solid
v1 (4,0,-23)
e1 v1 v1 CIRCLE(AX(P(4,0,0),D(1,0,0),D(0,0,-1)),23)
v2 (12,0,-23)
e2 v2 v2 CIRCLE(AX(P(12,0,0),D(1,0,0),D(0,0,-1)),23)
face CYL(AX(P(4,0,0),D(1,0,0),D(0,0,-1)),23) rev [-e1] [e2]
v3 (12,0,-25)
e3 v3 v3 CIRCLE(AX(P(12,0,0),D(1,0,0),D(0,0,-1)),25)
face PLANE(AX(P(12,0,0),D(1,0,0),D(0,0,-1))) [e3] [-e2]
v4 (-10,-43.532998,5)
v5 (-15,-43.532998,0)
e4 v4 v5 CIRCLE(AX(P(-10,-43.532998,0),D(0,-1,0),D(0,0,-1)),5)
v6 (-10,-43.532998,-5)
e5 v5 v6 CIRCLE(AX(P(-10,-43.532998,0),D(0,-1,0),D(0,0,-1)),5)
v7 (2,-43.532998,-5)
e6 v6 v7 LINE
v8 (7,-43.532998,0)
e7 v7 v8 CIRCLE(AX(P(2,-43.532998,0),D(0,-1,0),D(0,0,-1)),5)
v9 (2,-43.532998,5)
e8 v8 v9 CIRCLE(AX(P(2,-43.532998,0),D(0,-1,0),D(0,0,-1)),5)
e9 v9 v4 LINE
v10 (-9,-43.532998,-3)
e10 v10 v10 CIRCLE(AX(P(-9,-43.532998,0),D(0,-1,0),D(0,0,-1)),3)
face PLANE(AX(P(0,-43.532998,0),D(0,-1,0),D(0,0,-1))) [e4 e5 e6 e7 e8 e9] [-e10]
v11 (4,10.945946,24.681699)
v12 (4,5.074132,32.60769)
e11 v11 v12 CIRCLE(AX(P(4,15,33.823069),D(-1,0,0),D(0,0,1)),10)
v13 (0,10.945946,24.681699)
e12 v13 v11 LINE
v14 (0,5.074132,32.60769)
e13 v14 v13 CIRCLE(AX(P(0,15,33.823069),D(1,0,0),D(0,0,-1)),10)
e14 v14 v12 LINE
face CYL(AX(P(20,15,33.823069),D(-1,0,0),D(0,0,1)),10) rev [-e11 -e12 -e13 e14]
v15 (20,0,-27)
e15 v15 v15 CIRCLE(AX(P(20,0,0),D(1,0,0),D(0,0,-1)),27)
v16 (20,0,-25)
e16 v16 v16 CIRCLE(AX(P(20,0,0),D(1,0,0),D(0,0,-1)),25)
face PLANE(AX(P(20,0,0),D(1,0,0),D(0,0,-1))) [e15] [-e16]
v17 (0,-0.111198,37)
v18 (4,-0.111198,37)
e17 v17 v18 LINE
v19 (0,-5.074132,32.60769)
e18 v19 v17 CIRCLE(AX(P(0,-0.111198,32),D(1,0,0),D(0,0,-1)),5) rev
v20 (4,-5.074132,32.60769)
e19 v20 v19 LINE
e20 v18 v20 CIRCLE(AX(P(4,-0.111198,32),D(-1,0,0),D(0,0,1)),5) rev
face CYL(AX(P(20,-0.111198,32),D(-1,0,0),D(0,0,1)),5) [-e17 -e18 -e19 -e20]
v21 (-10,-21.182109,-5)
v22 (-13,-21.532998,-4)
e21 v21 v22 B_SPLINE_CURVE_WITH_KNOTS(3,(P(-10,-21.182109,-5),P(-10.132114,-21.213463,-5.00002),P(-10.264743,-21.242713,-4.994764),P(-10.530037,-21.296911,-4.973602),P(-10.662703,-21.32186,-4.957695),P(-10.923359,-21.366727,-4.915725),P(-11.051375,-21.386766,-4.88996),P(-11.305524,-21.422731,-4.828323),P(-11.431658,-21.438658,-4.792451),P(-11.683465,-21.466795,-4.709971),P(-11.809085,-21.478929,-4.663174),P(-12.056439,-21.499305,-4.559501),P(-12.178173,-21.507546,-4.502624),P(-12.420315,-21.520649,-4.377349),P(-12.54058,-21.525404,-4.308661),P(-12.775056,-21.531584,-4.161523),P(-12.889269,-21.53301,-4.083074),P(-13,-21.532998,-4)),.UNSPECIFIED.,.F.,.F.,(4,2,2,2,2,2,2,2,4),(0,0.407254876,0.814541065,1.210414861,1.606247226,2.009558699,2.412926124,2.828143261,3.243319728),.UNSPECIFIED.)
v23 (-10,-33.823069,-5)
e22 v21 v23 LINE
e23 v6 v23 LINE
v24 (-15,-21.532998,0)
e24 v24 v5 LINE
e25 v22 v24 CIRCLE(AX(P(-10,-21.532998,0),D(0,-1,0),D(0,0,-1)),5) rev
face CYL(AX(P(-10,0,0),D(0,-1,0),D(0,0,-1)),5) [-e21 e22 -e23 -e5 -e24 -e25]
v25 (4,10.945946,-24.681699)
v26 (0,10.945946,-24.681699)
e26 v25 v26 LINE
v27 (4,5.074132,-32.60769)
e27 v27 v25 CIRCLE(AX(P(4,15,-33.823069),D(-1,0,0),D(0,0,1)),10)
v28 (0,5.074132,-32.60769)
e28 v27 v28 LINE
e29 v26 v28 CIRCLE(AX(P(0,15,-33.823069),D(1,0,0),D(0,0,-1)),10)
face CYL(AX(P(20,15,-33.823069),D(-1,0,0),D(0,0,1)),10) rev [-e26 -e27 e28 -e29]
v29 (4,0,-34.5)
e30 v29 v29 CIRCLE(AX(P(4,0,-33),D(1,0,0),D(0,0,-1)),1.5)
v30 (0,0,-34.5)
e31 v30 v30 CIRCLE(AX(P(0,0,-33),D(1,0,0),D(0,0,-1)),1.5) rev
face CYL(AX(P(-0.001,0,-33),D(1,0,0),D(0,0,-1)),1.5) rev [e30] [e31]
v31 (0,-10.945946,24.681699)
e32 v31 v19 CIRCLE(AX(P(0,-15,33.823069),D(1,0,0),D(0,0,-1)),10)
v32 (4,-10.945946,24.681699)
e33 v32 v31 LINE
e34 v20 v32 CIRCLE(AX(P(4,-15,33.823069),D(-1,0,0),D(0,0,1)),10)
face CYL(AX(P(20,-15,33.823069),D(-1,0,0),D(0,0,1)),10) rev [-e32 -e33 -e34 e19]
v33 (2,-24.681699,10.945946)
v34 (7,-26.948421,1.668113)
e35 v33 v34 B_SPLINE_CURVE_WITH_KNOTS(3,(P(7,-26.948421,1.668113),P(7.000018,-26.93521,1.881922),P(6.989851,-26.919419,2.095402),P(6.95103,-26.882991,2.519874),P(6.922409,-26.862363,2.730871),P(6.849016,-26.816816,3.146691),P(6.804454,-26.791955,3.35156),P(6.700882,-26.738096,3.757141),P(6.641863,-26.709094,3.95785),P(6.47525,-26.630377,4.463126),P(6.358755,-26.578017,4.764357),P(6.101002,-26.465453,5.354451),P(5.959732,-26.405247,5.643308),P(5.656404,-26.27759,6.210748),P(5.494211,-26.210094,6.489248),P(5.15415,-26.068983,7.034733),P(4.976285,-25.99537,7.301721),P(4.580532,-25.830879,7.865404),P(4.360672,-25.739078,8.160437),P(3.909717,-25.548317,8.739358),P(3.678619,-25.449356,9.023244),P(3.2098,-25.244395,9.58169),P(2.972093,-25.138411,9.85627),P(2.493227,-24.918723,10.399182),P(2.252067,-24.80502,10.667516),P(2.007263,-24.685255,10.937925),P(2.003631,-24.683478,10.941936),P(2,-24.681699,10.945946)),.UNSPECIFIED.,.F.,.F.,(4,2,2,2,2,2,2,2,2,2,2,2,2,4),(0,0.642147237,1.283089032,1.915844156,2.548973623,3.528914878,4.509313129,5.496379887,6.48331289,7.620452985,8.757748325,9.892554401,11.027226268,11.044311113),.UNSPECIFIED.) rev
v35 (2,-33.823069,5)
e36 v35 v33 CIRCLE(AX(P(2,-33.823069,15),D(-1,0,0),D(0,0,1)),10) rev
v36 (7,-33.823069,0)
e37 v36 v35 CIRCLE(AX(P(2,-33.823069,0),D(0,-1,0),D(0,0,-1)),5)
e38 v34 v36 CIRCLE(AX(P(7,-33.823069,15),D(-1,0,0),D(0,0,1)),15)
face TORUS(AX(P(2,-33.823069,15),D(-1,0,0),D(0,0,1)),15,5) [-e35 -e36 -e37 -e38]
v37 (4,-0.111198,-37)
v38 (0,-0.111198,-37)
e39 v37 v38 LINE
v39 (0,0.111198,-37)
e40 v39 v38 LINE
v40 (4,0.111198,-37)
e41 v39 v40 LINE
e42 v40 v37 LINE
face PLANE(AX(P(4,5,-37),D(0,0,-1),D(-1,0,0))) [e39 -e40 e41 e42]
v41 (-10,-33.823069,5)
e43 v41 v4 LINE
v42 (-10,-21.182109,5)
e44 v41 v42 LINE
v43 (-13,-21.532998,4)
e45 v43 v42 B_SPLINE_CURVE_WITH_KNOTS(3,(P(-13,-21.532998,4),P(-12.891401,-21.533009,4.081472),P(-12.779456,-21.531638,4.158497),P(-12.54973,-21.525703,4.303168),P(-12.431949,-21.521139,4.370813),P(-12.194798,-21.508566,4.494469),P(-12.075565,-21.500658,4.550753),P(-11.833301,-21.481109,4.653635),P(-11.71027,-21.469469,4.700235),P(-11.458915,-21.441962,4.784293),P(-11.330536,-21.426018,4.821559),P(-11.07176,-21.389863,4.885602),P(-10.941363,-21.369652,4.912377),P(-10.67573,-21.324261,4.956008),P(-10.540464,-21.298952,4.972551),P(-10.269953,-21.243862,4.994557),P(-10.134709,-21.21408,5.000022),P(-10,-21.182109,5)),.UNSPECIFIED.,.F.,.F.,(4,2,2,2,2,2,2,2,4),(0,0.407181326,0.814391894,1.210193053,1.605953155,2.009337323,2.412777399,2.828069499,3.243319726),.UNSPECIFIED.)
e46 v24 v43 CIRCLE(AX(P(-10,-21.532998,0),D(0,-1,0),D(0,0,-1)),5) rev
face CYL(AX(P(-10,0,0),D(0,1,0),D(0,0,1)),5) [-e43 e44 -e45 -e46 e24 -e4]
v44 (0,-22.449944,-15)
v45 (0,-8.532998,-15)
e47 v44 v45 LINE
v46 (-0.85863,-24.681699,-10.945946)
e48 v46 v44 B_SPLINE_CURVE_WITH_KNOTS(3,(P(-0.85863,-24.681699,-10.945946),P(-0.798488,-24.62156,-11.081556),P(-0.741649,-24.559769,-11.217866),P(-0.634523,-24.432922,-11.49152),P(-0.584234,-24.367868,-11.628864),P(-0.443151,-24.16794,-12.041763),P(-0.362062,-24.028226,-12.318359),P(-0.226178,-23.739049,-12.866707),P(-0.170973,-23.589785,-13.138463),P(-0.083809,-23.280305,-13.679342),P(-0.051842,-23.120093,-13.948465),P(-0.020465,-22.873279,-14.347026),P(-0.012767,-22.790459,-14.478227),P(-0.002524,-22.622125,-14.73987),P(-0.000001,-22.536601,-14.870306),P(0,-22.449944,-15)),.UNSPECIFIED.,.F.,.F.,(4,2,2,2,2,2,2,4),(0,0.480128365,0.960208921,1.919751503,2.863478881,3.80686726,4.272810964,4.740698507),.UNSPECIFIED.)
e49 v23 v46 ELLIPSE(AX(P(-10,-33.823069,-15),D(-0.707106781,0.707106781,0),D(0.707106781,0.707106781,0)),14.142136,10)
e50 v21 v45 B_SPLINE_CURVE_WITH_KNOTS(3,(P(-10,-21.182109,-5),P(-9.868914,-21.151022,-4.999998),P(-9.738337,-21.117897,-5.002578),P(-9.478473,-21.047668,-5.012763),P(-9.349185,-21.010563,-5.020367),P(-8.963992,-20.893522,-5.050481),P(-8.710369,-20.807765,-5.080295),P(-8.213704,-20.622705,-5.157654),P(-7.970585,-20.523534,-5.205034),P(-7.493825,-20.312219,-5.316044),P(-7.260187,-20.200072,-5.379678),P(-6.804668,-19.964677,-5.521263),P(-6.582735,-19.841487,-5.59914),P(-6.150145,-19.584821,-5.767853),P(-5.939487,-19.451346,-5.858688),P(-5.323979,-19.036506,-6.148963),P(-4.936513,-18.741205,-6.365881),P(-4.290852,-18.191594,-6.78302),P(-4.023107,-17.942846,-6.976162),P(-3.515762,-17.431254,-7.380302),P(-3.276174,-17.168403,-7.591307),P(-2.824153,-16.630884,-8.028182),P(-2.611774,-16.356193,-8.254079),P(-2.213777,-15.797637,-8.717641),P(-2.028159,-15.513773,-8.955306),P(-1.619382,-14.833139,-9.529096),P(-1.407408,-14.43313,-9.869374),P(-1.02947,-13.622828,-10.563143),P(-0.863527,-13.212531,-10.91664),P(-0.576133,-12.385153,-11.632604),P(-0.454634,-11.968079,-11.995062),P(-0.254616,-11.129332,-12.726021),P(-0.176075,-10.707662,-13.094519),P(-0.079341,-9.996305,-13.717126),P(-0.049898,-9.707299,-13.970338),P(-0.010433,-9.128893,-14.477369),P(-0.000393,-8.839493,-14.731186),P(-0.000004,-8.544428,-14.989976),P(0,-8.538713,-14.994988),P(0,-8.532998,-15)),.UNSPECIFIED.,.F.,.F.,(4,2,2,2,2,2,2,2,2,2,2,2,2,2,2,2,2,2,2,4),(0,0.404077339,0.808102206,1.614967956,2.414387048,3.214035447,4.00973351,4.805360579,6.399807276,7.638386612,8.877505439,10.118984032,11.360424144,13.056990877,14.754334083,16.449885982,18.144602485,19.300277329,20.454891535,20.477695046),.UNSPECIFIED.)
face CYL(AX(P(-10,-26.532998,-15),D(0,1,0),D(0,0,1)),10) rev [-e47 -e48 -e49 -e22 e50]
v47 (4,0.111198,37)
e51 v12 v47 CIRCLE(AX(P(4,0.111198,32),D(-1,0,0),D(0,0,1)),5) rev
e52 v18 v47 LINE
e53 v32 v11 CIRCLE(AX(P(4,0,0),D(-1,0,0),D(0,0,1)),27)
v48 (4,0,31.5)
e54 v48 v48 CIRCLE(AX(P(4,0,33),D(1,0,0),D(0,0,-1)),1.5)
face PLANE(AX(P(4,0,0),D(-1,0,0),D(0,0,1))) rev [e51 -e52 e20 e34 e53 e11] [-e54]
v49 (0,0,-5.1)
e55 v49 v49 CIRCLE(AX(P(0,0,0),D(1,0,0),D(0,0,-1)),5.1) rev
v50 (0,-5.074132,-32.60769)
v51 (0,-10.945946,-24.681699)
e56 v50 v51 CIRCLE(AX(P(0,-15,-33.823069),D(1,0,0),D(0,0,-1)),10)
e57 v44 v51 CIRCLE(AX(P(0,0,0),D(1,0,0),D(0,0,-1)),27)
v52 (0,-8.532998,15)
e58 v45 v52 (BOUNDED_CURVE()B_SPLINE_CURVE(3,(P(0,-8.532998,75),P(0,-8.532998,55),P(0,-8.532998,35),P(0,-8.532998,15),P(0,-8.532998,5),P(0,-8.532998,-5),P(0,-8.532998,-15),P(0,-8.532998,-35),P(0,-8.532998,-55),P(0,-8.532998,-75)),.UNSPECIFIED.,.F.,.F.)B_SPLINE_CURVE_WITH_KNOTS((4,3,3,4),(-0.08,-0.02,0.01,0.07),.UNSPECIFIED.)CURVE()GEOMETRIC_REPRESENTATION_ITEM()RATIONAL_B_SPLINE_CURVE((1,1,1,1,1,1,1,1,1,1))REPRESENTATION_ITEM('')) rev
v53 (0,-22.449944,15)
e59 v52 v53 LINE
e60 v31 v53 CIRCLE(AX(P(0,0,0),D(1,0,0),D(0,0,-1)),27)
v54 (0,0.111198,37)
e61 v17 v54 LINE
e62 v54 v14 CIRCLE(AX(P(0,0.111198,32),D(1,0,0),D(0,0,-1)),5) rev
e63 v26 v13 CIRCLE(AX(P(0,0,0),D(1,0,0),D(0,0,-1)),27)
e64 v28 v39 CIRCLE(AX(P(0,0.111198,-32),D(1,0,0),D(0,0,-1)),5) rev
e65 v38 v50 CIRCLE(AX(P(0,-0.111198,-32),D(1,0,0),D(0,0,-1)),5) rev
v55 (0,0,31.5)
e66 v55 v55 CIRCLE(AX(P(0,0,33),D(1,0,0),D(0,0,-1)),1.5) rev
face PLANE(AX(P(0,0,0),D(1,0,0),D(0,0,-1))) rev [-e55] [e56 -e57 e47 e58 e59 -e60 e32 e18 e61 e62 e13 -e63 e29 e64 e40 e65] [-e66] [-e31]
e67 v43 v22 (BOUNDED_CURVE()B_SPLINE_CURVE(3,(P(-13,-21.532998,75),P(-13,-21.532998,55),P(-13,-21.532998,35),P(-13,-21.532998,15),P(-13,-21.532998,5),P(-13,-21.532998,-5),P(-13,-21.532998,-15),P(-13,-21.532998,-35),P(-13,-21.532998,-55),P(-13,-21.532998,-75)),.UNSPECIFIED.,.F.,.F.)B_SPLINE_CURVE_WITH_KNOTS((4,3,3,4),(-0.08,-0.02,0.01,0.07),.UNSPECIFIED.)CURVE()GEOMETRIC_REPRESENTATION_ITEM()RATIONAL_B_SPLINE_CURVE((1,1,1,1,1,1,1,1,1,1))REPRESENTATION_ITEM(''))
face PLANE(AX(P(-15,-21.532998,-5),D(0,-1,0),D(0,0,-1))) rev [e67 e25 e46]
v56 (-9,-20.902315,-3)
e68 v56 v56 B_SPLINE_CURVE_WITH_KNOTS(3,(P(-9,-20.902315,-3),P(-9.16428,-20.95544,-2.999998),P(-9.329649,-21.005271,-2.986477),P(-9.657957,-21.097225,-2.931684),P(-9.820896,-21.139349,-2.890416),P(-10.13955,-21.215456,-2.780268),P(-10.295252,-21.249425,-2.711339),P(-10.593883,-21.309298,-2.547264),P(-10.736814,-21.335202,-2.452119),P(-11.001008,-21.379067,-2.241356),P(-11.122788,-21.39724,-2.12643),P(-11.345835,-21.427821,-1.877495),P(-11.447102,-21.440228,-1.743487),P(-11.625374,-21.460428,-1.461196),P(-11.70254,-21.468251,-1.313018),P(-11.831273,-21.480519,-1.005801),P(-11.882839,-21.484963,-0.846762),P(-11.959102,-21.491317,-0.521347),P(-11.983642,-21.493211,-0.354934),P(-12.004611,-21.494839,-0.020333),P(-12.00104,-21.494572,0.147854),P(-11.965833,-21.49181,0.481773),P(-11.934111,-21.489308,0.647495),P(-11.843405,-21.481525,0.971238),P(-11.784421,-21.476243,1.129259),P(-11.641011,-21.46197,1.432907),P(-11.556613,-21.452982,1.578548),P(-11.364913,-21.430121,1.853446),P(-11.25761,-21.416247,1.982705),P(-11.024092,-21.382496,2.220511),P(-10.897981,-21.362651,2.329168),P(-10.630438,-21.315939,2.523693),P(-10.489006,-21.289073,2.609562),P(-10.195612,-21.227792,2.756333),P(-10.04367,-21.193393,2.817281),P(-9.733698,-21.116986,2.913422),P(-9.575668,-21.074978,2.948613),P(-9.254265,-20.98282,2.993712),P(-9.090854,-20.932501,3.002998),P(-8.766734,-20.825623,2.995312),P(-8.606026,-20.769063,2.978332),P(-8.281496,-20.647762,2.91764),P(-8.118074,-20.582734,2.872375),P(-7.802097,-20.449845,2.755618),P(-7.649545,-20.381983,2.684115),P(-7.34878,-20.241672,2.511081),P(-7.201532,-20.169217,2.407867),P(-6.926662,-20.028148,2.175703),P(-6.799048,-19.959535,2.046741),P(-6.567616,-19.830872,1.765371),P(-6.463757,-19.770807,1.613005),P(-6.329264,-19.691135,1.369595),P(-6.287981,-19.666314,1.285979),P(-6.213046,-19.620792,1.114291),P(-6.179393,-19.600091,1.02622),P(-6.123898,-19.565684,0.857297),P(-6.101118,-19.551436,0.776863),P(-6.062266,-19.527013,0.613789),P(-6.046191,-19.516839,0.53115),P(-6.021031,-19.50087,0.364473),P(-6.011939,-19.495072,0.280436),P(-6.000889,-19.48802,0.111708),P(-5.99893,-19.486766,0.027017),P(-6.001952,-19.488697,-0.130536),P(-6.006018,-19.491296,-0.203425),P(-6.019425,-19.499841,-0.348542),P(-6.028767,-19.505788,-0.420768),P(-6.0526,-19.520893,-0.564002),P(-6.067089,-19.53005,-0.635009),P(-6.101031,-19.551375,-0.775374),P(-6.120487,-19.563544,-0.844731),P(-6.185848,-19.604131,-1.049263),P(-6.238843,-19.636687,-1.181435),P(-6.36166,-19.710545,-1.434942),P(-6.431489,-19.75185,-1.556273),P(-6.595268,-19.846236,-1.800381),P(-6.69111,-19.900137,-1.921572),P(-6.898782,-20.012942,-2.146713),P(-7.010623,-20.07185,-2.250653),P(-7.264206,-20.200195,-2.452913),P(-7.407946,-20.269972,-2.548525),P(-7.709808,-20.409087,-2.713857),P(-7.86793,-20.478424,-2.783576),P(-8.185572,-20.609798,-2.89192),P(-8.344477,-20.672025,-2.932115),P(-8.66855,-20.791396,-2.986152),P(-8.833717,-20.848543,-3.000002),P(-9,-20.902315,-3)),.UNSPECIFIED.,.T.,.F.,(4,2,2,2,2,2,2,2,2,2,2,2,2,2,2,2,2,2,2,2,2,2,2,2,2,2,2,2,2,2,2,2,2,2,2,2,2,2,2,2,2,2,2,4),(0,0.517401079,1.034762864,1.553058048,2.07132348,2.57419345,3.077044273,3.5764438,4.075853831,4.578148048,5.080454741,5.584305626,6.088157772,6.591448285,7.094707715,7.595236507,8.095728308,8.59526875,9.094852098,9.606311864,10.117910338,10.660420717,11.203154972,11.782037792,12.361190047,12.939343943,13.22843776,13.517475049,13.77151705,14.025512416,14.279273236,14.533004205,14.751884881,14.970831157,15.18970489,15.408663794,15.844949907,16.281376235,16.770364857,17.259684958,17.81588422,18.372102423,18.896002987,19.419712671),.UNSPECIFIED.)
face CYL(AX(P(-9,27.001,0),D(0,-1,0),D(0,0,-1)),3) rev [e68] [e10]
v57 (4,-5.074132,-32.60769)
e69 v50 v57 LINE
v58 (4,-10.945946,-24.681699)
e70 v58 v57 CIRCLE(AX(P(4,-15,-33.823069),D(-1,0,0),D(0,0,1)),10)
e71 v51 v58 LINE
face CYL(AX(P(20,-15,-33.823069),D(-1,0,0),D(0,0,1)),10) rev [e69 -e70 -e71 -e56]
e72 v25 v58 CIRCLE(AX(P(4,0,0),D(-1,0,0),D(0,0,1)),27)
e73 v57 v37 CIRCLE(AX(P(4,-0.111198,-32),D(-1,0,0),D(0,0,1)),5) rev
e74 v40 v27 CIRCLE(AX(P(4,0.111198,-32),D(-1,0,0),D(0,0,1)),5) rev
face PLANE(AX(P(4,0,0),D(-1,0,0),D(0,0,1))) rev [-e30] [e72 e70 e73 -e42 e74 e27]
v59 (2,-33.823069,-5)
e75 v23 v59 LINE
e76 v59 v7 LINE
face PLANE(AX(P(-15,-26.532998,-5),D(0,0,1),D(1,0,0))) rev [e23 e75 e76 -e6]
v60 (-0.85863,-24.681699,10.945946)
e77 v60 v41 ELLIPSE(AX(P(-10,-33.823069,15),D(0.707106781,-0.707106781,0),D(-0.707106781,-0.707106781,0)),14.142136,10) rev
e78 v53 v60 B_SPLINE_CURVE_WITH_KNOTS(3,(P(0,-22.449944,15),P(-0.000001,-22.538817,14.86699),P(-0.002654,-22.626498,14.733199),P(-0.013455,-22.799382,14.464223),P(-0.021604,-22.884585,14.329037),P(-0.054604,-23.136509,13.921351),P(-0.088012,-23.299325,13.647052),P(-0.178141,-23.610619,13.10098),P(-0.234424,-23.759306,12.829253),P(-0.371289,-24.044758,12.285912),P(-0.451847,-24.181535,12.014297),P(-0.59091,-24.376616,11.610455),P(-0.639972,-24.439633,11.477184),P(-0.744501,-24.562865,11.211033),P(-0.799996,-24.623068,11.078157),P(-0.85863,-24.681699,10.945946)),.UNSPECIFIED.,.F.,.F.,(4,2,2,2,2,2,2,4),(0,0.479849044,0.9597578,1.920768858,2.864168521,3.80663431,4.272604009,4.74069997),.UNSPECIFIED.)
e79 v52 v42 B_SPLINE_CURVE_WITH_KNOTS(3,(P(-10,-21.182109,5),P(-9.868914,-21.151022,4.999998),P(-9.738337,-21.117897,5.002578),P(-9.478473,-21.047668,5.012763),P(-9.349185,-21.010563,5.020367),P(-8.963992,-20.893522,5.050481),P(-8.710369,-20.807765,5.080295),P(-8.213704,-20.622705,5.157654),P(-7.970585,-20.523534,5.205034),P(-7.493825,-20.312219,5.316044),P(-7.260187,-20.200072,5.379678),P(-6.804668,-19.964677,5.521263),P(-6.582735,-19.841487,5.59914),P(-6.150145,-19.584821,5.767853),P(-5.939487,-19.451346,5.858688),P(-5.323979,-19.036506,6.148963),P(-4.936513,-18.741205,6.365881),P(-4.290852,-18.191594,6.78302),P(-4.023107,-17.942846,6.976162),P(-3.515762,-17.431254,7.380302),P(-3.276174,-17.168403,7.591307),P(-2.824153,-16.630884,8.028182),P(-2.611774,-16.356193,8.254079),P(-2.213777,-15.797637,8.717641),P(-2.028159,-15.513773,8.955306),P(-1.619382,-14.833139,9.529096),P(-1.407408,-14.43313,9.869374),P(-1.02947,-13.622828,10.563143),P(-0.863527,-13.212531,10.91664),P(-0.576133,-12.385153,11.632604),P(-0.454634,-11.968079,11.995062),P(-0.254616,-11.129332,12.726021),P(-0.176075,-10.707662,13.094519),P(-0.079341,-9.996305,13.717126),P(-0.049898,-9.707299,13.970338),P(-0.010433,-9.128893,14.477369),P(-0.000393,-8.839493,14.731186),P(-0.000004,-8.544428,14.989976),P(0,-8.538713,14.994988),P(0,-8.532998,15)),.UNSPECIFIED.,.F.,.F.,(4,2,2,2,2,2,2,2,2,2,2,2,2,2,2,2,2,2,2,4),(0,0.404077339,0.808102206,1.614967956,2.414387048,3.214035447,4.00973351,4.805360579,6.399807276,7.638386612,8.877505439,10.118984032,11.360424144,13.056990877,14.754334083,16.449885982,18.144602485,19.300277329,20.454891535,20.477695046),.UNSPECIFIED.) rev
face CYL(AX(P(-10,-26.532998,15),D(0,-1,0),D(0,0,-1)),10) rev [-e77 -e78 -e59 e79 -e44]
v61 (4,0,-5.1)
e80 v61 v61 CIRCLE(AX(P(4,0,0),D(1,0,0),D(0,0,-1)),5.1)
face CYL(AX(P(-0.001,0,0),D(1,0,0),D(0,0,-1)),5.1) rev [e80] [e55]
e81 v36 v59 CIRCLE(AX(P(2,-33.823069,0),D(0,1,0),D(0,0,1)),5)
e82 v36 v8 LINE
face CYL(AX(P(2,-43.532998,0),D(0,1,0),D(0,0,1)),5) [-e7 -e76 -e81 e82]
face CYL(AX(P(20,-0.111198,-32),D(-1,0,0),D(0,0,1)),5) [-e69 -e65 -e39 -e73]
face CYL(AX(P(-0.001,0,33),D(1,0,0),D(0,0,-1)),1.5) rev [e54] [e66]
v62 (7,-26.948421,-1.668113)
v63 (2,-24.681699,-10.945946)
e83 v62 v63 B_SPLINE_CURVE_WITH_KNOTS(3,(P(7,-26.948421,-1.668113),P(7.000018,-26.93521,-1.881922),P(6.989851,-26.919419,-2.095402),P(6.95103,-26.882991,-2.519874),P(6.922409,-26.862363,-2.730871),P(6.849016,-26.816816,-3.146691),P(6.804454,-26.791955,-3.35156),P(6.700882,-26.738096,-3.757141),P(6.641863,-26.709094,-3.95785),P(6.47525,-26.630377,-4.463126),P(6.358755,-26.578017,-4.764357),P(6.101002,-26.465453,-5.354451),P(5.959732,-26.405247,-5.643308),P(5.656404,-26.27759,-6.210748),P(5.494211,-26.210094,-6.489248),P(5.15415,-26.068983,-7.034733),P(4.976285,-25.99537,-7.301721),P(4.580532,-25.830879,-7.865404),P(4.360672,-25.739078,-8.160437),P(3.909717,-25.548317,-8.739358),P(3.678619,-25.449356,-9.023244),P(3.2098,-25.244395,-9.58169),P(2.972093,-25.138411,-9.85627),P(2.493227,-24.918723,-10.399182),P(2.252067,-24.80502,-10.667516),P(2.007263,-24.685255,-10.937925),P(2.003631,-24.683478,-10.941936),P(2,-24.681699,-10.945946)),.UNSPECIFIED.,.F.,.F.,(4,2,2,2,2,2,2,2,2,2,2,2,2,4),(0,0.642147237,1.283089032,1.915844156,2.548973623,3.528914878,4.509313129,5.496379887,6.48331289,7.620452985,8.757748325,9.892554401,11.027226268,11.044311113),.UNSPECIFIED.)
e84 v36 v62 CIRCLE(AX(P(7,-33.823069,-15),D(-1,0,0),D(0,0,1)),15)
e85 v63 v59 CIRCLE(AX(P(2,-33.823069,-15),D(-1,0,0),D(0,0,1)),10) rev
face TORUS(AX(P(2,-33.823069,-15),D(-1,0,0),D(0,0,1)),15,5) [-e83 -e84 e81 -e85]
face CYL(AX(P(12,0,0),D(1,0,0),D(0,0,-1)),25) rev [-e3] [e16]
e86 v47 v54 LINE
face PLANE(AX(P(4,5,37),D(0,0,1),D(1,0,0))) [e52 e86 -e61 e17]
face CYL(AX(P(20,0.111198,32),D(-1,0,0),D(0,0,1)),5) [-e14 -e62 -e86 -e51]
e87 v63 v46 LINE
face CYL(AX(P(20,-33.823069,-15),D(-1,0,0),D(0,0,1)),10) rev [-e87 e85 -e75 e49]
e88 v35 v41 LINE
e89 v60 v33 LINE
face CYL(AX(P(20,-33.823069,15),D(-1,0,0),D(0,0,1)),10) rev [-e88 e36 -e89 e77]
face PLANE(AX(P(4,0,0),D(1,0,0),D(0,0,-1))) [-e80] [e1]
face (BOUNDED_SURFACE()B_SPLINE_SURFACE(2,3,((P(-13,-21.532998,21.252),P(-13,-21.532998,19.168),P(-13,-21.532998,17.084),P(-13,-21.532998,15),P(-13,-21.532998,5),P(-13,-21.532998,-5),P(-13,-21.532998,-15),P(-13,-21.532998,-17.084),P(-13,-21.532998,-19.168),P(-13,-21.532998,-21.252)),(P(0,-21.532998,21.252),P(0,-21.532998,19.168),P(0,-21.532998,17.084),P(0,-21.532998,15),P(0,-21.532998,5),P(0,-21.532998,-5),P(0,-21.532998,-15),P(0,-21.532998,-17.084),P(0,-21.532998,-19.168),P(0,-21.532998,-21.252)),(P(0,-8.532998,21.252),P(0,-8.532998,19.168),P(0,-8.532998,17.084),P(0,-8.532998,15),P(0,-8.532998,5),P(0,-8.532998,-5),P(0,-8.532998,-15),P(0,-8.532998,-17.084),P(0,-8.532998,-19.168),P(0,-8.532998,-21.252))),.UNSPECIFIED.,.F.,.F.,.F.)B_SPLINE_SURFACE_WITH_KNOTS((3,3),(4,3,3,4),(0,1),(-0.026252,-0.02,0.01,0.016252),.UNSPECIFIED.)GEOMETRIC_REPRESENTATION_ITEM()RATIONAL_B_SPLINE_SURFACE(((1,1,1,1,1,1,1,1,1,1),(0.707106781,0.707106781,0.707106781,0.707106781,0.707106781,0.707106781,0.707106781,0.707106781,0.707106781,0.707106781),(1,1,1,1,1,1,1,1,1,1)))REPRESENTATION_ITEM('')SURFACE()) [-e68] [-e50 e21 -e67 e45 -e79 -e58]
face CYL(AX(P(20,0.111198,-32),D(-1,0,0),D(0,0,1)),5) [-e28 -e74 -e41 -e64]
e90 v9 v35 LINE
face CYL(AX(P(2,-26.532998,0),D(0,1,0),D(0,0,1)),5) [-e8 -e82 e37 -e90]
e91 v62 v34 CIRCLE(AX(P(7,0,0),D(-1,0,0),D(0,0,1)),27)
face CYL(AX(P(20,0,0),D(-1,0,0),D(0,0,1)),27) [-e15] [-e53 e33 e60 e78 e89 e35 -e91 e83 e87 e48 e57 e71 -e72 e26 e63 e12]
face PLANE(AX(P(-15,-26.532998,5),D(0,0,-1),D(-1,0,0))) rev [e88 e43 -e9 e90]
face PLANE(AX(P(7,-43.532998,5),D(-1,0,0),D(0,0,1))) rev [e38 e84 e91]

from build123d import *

# Parameters (mm, degrees)
SKETCH_1_R          = 27
EXTRUDE_1_DEPTH     = 20
EXTRUDE_2_DEPTH     = 4
SKETCH_2_R          = 25
CUT_EXTRUDE_1_DEPTH = 8
SKETCH_3_R          = 23
CUT_EXTRUDE_2_DEPTH = 8
CUT_EXTRUDE_5_REACH = 50.518
SKETCH_8_R          = 5.1
CUT_EXTRUDE_6_REACH = 50.518
SKETCH_11_R         = 1.5
FILLET_1_R          = 10
FILLET_2_R          = 5
SKETCH_12_W         = 10
SKETCH_12_H         = 5
EXTRUDE_3_DEPTH     = 15
SKETCH_13_W         = 22
SKETCH_13_H         = 10
EXTRUDE_4_DEPTH     = 17
FILLET_3_R          = 10
FILLET_START        = -21.532998323
FILLET_4_DEPTH      = 0.497094834
FILLET_START_2      = -21.035903489
FILLET_4_2_DEPTH    = 12.502905266
FILLET_START_3      = -37
FILLET_4_3_DEPTH    = 74
FILLET_START_4      = -5
FILLET_4_4_DEPTH    = 10
CUT_EXTRUDE_7_REACH = 84.121
SKETCH_14_R         = 3
FILLET_5_R          = 5


with BuildPart() as part:
    # 草图1 → 凸台-拉伸1 (new body)
    with BuildSketch(Plane(origin=(0, 0, 0), x_dir=(0, 0, -1), z_dir=(1, 0, 0))):
        Circle(SKETCH_1_R)
    extrude(amount=EXTRUDE_1_DEPTH)

    # 草图10 → 凸台-拉伸2 (add)
    with BuildSketch(Plane.ZY):
        Polygon((0, 5), (37, 5), (37, -5), (0, -5), (-37, -5), (-37, 5), align=None)
    extrude(amount=-EXTRUDE_2_DEPTH)

    # 草图2 → 切除-拉伸1 (cut)
    with BuildSketch(Plane(origin=(20, 0, 0), x_dir=(0, 0, -1), z_dir=(1, 0, 0))):
        Circle(SKETCH_2_R)
    extrude(amount=-CUT_EXTRUDE_1_DEPTH, mode=Mode.SUBTRACT)

    # 草图3 → 切除-拉伸2 (cut)
    with BuildSketch(Plane(origin=(12, 0, 0), x_dir=(0, 0, -1), z_dir=(1, 0, 0))):
        Circle(SKETCH_3_R)
    extrude(amount=-CUT_EXTRUDE_2_DEPTH, mode=Mode.SUBTRACT)

    # 草图8 → 切除-拉伸5 (cut, up to next)
    with BuildSketch(Plane(origin=(4, 0, 0), x_dir=(0, 0, -1), z_dir=(1, 0, 0)), mode=Mode.PRIVATE) as cut_extrude_5_sk1:
        Circle(SKETCH_8_R)
    cut_extrude_5_tool1 = extrude(cut_extrude_5_sk1.sketch, amount=-CUT_EXTRUDE_5_REACH, mode=Mode.PRIVATE) & part.part
    add(cut_extrude_5_tool1.solids().sort_by_distance((4, 0, 0))[0], mode=Mode.SUBTRACT)

    # 草图11 → 切除-拉伸6 (cut, up to next)
    with BuildSketch(Plane(origin=(4, 0, 0), x_dir=(0, 0, -1), z_dir=(1, 0, 0)), mode=Mode.PRIVATE) as cut_extrude_6_sk1:
        with Locations((-33, 0)):
            Circle(SKETCH_11_R)
    cut_extrude_6_tool1 = extrude(cut_extrude_6_sk1.sketch, amount=-CUT_EXTRUDE_6_REACH, mode=Mode.PRIVATE) & part.part
    # 草图11 → 切除-拉伸6 (cut, up to next)
    with BuildSketch(Plane(origin=(4, 0, 0), x_dir=(0, 0, -1), z_dir=(1, 0, 0)), mode=Mode.PRIVATE) as cut_extrude_6_sk2:
        with Locations((33, 0)):
            Circle(SKETCH_11_R)
    cut_extrude_6_tool2 = extrude(cut_extrude_6_sk2.sketch, amount=-CUT_EXTRUDE_6_REACH, mode=Mode.PRIVATE) & part.part
    add(cut_extrude_6_tool1.solids().sort_by_distance((4, 0, 33))[0], mode=Mode.SUBTRACT)
    add(cut_extrude_6_tool2.solids().sort_by_distance((4, 0, -33))[0], mode=Mode.SUBTRACT)

    # 圆角1
    fillet_1_edges = [part.edges().sort_by_distance(p)[0] for p in [
        (2, 5, -26.532998323),
        (2, 5, 26.532998323),
        (2, -5, 26.532998323),
        (2, -5, -26.532998323),
    ]]
    fillet(fillet_1_edges, radius=FILLET_1_R)

    # 圆角2
    fillet_2_edges = [part.edges().sort_by_distance(p)[0] for p in [
        (2, 5, 37),
        (2, -5, 37),
        (2, -5, -37),
        (2, 5, -37),
    ]]
    fillet(fillet_2_edges, radius=FILLET_2_R)

    # 草图12 → 凸台-拉伸3 (add)
    with BuildSketch(Plane.ZY):
        with Locations((0, -24.032998323)):
            Rectangle(SKETCH_12_W, SKETCH_12_H)
    extrude(amount=EXTRUDE_3_DEPTH)

    # 草图13 → 凸台-拉伸4 (add)
    with BuildSketch(Plane.XZ.offset(26.532998323)):
        with Locations((-4, 0)):
            Rectangle(SKETCH_13_W, SKETCH_13_H)
    extrude(amount=EXTRUDE_4_DEPTH)

    # 圆角3
    fillet_3_edges = [part.edges().sort_by_distance(p)[0] for p in [
        (0, -24.032998323, -5),
        (0, -24.032998323, 5),
        (3.5, -26.532998323, -5),
        (3.5, -26.532998323, 5),
    ]]
    fillet(fillet_3_edges, radius=FILLET_3_R)

    # 圆角4: read off the stored shape, not the designer's step
    # 圆角4 outline → 圆角4 (add)
    with BuildSketch(Plane(origin=(0, 0, 0), x_dir=(1, 0, 0), z_dir=(0, 1, 0)).offset(FILLET_START)):
        with BuildLine():
            Line((0, -15), (0, -5))
            Line((0, -5), (-10, -5))
            ThreePointArc((-10, -5), (-2.928932188, -7.928932188), (0, -15))
        make_face()
        with BuildLine():
            ThreePointArc((0, 15), (-2.928932188, 7.928932188), (-10, 5))
            Line((-10, 5), (0, 5))
            Line((0, 5), (0, 15))
        make_face()
    extrude(amount=FILLET_4_DEPTH)

    # Fillet 4 2 outline → Fillet 4 2 (add)
    with BuildSketch(Plane(origin=(0, 0, 0), x_dir=(1, 0, 0), z_dir=(0, 1, 0)).offset(FILLET_START_2)):
        with BuildLine():
            Line((0, -15), (0, -5))
            Line((0, -5), (-10, -5))
            ThreePointArc((-10, -5), (-2.928932188, -7.928932188), (0, -15))
        make_face()
        with BuildLine():
            ThreePointArc((0, 15), (-2.928932188, 7.928932188), (-10, 5))
            Line((-10, 5), (0, 5))
            Line((0, 5), (0, 15))
        make_face()
    extrude(amount=FILLET_4_2_DEPTH)

    # Fillet 4 3 outline → Fillet 4 3 (cut)
    with BuildSketch(Plane.XY.offset(FILLET_START_3)):
        with BuildLine():
            Line((-15, -21.532998323), (-13, -21.532998323))
            add(Edge.make_bspline(
                [(-13, -21.532998323), (0, -21.532998323), (0, -8.532998323)],
                knots=[0, 0, 0, 1, 1, 1], degree=2, weights=[1, 0.707106781, 1]))
            Line((0, -8.532998323), (0, -7))
            Line((0, -7), (-15, -7))
            Line((-15, -7), (-15, -21.532998323))
        make_face()
    extrude(amount=FILLET_4_3_DEPTH, mode=Mode.SUBTRACT)

    # Fillet 4 4 outline → Fillet 4 4 (add)
    with BuildSketch(Plane.XY.offset(FILLET_START_4)):
        with BuildLine():
            add(Edge.make_bspline(
                [(-13, -21.532998323), (0, -21.532998323), (0, -8.532998323)],
                knots=[0, 0, 0, 1, 1, 1], degree=2, weights=[1, 0.707106781, 1]))
            Line((-13, -21.532998323), (0, -21.532998323))
            Line((0, -21.532998323), (0, -8.532998323))
        make_face()
    extrude(amount=FILLET_4_4_DEPTH)

    # 草图14 → 切除-拉伸7 (cut, up to next)
    with BuildSketch(Plane(origin=(0, -43.532998323, 0), x_dir=(-1, 0, 0), z_dir=(0, -1, 0)), mode=Mode.PRIVATE) as cut_extrude_7_sk1:
        with Locations(Location((9, 0, 0), (0, 0, 90))):
            Circle(SKETCH_14_R)
    cut_extrude_7_tool1 = extrude(cut_extrude_7_sk1.sketch, amount=-CUT_EXTRUDE_7_REACH, mode=Mode.PRIVATE) & part.part
    add(cut_extrude_7_tool1.solids().sort_by_distance((-9, -43.532998, 0))[0], mode=Mode.SUBTRACT)

    # 圆角5
    # the kernel refuses this fillet: 5 mm, written as the material it takes off along each edge
    with BuildSketch(Plane(origin=(7, -33.823069051, -15), x_dir=(0, 0, 1), z_dir=(0, -1, 0))) as fillet_5_piece_1_section:
        with BuildLine():
            CenterArc((10 + FILLET_5_R, FILLET_5_R), FILLET_5_R, 180, 90)
            Line((10 + FILLET_5_R, 0), (10, 0))
            Line((10, 0), (10, FILLET_5_R))
        make_face()
    fillet_5_piece_1 = revolve(axis=Axis((7, -33.823069051, -15), (-1, 0, 0)), revolution_arc=137.718699106, mode=Mode.PRIVATE)
    fillet_5_piece_1 = fillet_5_piece_1 - Plane(origin=(7, 0, 0), x_dir=(0, 0, -1), z_dir=(-1, 0, 0)) * Cylinder(27, 60, mode=Mode.PRIVATE)
    add(fillet_5_piece_1, mode=Mode.SUBTRACT)
    with BuildSketch(Plane(origin=(7, -33.823069051, 15), x_dir=(0, 0, -1), z_dir=(0, -1, 0))) as fillet_5_piece_2_section:
        with BuildLine():
            CenterArc((10 + FILLET_5_R, -FILLET_5_R), FILLET_5_R, 90, 90)
            Line((10 + FILLET_5_R, 0), (10, 0))
            Line((10, 0), (10, -FILLET_5_R))
        make_face()
    fillet_5_piece_2 = revolve(axis=Axis((7, -33.823069051, 15), (1, 0, 0)), revolution_arc=137.718699106, mode=Mode.PRIVATE)
    fillet_5_piece_2 = fillet_5_piece_2 - Plane(origin=(7, 0, 0), x_dir=(0, 0, -1), z_dir=(-1, 0, 0)) * Cylinder(27, 60, mode=Mode.PRIVATE)
    add(fillet_5_piece_2, mode=Mode.SUBTRACT)
    with BuildSketch(Plane(origin=(7, -33.823069051, -5), x_dir=(-1, 0, 0), z_dir=(0, -1, 0))) as fillet_5_piece_3:
        with BuildLine():
            CenterArc((FILLET_5_R, -FILLET_5_R), FILLET_5_R, 90, 90)
            Line((0, -FILLET_5_R), (0, 0))
            Line((0, 0), (FILLET_5_R, 0))
        make_face()
    extrude(amount=22.209929272, mode=Mode.SUBTRACT)
    with BuildSketch(Plane(origin=(7, -33.823069051, 5), x_dir=(-1, 0, 0), z_dir=(0, -1, 0))) as fillet_5_piece_4:
        with BuildLine():
            CenterArc((FILLET_5_R, FILLET_5_R), FILLET_5_R, 180, 90)
            Line((0, FILLET_5_R), (0, 0))
            Line((0, 0), (FILLET_5_R, 0))
        make_face()
    extrude(amount=22.209929272, mode=Mode.SUBTRACT)
    with BuildSketch(Plane(origin=(-15, -9.032998323, 5), x_dir=(1, 0, 0), z_dir=(0, -1, 0)), Plane(origin=(-15, -56.032998323, -5), x_dir=(1, 0, 0), z_dir=(0, 1, 0))) as fillet_5_piece_5:
        with BuildLine():
            CenterArc((FILLET_5_R, -FILLET_5_R), FILLET_5_R, 90, 90)
            Line((0, -FILLET_5_R), (0, 0))
            Line((0, 0), (FILLET_5_R, 0))
        make_face()
    extrude(amount=47, mode=Mode.SUBTRACT)


solid = part.part
